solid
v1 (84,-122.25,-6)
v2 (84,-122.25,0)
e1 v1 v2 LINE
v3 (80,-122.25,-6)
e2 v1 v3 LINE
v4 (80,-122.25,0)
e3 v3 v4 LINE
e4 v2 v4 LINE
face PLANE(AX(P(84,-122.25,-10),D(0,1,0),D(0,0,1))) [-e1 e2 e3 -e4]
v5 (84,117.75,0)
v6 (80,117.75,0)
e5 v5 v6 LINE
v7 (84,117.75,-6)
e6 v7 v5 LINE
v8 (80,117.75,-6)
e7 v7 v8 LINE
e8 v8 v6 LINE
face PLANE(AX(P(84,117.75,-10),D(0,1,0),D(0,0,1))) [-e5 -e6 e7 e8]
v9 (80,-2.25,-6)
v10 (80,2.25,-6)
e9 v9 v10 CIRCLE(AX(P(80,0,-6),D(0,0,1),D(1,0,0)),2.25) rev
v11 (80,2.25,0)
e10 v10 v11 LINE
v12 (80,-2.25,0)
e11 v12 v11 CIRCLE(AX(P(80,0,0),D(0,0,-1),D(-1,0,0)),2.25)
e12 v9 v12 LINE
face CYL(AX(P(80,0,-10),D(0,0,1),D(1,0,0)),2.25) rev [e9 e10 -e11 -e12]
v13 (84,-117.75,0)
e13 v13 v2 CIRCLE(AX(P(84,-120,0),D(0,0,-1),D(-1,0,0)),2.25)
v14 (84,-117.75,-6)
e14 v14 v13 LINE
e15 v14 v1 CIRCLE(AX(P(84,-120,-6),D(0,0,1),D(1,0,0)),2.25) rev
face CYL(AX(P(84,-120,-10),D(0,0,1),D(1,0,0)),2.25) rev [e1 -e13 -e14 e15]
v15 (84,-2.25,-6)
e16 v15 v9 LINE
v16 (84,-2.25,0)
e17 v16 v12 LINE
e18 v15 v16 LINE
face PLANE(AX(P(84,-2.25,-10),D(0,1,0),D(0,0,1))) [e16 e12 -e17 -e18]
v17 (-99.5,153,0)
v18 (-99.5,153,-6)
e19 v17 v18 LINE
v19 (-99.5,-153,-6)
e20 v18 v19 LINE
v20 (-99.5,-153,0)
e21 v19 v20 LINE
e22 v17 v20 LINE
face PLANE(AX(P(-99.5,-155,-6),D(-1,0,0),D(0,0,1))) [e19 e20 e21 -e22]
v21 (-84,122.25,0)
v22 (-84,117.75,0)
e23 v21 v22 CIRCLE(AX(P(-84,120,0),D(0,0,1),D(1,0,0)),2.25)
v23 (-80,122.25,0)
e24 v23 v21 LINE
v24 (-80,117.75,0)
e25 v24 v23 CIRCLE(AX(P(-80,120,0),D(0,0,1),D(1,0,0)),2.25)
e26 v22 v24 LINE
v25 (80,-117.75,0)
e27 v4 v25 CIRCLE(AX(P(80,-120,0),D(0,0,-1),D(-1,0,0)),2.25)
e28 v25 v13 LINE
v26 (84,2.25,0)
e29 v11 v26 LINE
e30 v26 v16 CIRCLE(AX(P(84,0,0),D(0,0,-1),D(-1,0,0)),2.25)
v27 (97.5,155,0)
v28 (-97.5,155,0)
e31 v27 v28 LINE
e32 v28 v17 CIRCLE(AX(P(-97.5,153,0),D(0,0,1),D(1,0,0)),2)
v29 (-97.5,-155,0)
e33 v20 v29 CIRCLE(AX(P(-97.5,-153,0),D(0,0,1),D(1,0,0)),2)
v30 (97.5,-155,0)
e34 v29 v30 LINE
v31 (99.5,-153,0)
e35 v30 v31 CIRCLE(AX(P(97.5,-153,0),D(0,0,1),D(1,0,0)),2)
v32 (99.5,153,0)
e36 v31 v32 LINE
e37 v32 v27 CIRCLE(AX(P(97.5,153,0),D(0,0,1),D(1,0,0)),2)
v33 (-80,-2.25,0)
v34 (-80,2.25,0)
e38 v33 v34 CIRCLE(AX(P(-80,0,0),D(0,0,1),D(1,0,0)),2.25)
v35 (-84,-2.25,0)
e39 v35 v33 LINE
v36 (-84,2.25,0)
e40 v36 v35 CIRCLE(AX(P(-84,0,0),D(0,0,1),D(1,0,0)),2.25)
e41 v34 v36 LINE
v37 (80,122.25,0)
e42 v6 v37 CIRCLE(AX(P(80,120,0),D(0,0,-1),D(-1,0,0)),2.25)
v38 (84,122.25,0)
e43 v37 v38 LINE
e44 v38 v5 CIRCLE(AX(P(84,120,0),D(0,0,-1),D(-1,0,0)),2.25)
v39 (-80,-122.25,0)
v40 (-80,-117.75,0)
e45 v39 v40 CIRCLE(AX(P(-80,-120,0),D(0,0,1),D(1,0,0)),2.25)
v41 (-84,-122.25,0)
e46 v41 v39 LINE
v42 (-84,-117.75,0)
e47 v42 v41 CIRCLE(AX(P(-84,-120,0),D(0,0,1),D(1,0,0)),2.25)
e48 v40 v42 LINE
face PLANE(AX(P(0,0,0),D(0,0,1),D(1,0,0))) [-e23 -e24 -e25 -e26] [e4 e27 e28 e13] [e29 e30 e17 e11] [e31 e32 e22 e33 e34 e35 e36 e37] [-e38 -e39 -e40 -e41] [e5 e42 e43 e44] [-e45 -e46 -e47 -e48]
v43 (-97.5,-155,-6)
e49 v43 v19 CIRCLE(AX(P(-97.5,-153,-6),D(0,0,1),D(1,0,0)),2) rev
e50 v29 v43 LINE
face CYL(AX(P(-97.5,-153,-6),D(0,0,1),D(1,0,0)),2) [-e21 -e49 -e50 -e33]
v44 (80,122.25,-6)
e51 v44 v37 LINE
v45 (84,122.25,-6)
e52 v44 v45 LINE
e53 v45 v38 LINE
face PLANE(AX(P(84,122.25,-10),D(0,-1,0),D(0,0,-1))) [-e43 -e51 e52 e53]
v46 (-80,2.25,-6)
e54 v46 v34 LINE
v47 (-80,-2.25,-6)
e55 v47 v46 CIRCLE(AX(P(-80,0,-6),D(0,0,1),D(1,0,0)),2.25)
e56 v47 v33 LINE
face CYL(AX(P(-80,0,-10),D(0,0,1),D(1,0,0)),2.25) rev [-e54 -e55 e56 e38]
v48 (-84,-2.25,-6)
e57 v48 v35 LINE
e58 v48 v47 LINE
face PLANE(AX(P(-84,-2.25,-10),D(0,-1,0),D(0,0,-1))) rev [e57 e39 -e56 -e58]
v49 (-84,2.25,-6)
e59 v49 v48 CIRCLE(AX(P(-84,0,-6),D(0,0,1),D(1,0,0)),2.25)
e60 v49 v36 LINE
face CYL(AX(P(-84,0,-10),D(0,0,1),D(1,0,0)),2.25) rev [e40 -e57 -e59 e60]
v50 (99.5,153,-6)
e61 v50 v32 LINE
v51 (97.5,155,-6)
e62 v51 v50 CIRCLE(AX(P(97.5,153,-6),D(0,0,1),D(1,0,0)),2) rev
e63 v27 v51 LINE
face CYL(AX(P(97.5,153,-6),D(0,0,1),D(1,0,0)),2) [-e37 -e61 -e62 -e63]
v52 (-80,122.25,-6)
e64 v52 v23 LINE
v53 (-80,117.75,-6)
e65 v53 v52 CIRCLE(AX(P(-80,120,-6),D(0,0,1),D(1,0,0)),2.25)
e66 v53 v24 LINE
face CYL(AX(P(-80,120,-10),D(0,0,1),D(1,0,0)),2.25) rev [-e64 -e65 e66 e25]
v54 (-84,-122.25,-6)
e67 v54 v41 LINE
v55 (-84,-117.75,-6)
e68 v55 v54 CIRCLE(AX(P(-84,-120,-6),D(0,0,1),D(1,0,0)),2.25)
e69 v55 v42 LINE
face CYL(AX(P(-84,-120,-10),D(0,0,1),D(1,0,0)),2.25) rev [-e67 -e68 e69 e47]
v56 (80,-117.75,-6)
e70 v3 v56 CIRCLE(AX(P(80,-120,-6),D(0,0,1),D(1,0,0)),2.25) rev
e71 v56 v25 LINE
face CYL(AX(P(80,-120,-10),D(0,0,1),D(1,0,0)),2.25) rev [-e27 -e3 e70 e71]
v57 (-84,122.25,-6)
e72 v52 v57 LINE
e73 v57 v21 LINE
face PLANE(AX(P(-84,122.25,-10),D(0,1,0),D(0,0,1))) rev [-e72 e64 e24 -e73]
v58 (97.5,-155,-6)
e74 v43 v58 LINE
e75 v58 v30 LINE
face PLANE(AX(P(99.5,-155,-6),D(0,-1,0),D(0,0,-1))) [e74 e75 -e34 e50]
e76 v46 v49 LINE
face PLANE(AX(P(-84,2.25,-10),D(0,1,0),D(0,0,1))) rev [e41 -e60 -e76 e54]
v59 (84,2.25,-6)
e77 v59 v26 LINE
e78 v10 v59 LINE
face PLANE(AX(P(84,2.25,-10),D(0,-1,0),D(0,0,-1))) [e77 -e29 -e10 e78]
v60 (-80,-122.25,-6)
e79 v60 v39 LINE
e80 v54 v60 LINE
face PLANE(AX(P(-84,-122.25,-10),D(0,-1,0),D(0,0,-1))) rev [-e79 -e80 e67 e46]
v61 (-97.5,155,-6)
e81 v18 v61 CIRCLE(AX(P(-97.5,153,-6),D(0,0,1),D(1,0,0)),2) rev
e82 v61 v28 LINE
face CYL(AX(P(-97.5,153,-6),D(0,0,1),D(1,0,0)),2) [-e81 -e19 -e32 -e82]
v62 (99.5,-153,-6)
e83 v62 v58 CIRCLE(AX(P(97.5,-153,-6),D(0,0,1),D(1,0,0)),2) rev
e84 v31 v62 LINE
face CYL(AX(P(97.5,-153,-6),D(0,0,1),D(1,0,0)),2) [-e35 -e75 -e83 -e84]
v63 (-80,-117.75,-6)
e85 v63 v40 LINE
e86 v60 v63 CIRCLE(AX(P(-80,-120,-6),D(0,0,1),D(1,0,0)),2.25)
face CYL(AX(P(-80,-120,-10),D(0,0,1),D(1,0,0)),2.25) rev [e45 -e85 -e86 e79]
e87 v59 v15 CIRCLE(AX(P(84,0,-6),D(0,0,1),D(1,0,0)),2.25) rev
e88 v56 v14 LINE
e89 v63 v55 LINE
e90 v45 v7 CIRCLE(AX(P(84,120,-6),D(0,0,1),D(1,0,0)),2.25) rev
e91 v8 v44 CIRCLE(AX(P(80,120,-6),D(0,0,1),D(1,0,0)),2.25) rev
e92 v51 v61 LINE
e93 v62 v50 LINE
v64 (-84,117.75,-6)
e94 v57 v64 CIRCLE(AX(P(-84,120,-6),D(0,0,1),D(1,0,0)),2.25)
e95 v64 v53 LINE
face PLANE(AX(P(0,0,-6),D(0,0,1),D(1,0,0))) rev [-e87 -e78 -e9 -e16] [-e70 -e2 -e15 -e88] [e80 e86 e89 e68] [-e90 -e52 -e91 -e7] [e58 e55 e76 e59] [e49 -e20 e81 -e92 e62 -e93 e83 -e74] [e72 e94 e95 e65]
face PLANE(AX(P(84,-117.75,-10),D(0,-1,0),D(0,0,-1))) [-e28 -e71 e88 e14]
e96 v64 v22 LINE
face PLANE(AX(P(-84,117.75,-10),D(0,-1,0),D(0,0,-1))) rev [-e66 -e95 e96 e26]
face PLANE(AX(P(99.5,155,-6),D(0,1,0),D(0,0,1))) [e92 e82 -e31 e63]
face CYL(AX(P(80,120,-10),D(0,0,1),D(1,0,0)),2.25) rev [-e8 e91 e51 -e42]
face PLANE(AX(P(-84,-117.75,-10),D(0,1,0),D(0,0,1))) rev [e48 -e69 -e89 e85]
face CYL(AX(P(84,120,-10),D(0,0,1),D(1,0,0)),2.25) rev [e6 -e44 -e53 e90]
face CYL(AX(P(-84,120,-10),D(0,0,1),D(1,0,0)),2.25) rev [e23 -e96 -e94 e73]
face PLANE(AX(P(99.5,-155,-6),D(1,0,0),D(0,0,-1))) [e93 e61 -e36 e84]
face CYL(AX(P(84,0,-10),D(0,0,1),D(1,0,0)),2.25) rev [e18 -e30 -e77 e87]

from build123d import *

# Parameters (mm, degrees)
CROQUIS1_W             = 199
CROQUIS1_H             = 310
BRIDA_BASE1_DEPTH      = 6
CORTAR_EXTRUIR1_DEPTH  = 10
MATRIZL1_COUNT         = 2
MATRIZL1_PITCH         = 120
MATRIZL1_COL_COUNT     = 2
MATRIZL1_COL_PITCH     = 120
SIMETR_A1_COPY_1_DEPTH = 10
SIMETR_A1_COPY_2_DEPTH = 10
REDONDEO1_R            = 2


# Sheet-metal steps are written as plain solids
with BuildPart() as part:
    # Croquis1 → Brida base1 (new body)
    with BuildSketch(Plane.XY):
        Rectangle(CROQUIS1_W, CROQUIS1_H)
    extrude(amount=-BRIDA_BASE1_DEPTH)

    # Croquis4 → Cortar-Extruir1 (cut)
    with BuildSketch(Plane.XY):
        with BuildLine():
            Line((-84, 2.25), (-80, 2.25))
            ThreePointArc((-80, 2.25), (-77.75, 0), (-80, -2.25))
            Line((-80, -2.25), (-84, -2.25))
            ThreePointArc((-84, -2.25), (-86.25, 0), (-84, 2.25))
        make_face()
    cortar_extruir1 = extrude(amount=-CORTAR_EXTRUIR1_DEPTH, mode=Mode.SUBTRACT)

    # MatrizL1: Cortar-Extruir1 ×2
    with Locations(*[(0, i * MATRIZL1_PITCH, 0) for i in range(1, MATRIZL1_COUNT)]):
        add(cortar_extruir1, mode=Mode.SUBTRACT)

    # MatrizL1 col: Cortar-Extruir1 ×2
    with Locations(*[(0, -i * MATRIZL1_COL_PITCH, 0) for i in range(1, MATRIZL1_COL_COUNT)]):
        add(cortar_extruir1, mode=Mode.SUBTRACT)

    # Simetría1: Cortar-Extruir1 across plane
    add(cortar_extruir1.mirror(Plane(origin=(0, 0, 0), x_dir=(0, 0, 1), z_dir=(1, 0, 0))), mode=Mode.SUBTRACT)

    # Simetría1 copy 1 sketch → Simetría1 copy 1 (cut)
    with BuildSketch(Plane(origin=(0, 120, 0), x_dir=(-1, 0, 0), z_dir=(0, 0, 1))):
        with BuildLine():
            Line((-84, -2.25), (-80, -2.25))
            ThreePointArc((-80, -2.25), (-77.75, 0), (-80, 2.25))
            Line((-80, 2.25), (-84, 2.25))
            ThreePointArc((-84, 2.25), (-86.25, 0), (-84, -2.25))
        make_face()
    extrude(amount=-SIMETR_A1_COPY_1_DEPTH, mode=Mode.SUBTRACT)

    # Simetría1 copy 2 sketch → Simetría1 copy 2 (cut)
    with BuildSketch(Plane(origin=(0, -120, 0), x_dir=(-1, 0, 0), z_dir=(0, 0, 1))):
        with BuildLine():
            Line((-84, -2.25), (-80, -2.25))
            ThreePointArc((-80, -2.25), (-77.75, 0), (-80, 2.25))
            Line((-80, 2.25), (-84, 2.25))
            ThreePointArc((-84, 2.25), (-86.25, 0), (-84, -2.25))
        make_face()
    extrude(amount=-SIMETR_A1_COPY_2_DEPTH, mode=Mode.SUBTRACT)

    # Redondeo1
    redondeo1_edges = [part.edges().sort_by_distance(p)[0] for p in [
        (-99.5, 155, -3),
        (99.5, 155, -3),
        (99.5, -155, -3),
        (-99.5, -155, -3),
    ]]
    fillet(redondeo1_edges, radius=REDONDEO1_R)


solid = part.part
